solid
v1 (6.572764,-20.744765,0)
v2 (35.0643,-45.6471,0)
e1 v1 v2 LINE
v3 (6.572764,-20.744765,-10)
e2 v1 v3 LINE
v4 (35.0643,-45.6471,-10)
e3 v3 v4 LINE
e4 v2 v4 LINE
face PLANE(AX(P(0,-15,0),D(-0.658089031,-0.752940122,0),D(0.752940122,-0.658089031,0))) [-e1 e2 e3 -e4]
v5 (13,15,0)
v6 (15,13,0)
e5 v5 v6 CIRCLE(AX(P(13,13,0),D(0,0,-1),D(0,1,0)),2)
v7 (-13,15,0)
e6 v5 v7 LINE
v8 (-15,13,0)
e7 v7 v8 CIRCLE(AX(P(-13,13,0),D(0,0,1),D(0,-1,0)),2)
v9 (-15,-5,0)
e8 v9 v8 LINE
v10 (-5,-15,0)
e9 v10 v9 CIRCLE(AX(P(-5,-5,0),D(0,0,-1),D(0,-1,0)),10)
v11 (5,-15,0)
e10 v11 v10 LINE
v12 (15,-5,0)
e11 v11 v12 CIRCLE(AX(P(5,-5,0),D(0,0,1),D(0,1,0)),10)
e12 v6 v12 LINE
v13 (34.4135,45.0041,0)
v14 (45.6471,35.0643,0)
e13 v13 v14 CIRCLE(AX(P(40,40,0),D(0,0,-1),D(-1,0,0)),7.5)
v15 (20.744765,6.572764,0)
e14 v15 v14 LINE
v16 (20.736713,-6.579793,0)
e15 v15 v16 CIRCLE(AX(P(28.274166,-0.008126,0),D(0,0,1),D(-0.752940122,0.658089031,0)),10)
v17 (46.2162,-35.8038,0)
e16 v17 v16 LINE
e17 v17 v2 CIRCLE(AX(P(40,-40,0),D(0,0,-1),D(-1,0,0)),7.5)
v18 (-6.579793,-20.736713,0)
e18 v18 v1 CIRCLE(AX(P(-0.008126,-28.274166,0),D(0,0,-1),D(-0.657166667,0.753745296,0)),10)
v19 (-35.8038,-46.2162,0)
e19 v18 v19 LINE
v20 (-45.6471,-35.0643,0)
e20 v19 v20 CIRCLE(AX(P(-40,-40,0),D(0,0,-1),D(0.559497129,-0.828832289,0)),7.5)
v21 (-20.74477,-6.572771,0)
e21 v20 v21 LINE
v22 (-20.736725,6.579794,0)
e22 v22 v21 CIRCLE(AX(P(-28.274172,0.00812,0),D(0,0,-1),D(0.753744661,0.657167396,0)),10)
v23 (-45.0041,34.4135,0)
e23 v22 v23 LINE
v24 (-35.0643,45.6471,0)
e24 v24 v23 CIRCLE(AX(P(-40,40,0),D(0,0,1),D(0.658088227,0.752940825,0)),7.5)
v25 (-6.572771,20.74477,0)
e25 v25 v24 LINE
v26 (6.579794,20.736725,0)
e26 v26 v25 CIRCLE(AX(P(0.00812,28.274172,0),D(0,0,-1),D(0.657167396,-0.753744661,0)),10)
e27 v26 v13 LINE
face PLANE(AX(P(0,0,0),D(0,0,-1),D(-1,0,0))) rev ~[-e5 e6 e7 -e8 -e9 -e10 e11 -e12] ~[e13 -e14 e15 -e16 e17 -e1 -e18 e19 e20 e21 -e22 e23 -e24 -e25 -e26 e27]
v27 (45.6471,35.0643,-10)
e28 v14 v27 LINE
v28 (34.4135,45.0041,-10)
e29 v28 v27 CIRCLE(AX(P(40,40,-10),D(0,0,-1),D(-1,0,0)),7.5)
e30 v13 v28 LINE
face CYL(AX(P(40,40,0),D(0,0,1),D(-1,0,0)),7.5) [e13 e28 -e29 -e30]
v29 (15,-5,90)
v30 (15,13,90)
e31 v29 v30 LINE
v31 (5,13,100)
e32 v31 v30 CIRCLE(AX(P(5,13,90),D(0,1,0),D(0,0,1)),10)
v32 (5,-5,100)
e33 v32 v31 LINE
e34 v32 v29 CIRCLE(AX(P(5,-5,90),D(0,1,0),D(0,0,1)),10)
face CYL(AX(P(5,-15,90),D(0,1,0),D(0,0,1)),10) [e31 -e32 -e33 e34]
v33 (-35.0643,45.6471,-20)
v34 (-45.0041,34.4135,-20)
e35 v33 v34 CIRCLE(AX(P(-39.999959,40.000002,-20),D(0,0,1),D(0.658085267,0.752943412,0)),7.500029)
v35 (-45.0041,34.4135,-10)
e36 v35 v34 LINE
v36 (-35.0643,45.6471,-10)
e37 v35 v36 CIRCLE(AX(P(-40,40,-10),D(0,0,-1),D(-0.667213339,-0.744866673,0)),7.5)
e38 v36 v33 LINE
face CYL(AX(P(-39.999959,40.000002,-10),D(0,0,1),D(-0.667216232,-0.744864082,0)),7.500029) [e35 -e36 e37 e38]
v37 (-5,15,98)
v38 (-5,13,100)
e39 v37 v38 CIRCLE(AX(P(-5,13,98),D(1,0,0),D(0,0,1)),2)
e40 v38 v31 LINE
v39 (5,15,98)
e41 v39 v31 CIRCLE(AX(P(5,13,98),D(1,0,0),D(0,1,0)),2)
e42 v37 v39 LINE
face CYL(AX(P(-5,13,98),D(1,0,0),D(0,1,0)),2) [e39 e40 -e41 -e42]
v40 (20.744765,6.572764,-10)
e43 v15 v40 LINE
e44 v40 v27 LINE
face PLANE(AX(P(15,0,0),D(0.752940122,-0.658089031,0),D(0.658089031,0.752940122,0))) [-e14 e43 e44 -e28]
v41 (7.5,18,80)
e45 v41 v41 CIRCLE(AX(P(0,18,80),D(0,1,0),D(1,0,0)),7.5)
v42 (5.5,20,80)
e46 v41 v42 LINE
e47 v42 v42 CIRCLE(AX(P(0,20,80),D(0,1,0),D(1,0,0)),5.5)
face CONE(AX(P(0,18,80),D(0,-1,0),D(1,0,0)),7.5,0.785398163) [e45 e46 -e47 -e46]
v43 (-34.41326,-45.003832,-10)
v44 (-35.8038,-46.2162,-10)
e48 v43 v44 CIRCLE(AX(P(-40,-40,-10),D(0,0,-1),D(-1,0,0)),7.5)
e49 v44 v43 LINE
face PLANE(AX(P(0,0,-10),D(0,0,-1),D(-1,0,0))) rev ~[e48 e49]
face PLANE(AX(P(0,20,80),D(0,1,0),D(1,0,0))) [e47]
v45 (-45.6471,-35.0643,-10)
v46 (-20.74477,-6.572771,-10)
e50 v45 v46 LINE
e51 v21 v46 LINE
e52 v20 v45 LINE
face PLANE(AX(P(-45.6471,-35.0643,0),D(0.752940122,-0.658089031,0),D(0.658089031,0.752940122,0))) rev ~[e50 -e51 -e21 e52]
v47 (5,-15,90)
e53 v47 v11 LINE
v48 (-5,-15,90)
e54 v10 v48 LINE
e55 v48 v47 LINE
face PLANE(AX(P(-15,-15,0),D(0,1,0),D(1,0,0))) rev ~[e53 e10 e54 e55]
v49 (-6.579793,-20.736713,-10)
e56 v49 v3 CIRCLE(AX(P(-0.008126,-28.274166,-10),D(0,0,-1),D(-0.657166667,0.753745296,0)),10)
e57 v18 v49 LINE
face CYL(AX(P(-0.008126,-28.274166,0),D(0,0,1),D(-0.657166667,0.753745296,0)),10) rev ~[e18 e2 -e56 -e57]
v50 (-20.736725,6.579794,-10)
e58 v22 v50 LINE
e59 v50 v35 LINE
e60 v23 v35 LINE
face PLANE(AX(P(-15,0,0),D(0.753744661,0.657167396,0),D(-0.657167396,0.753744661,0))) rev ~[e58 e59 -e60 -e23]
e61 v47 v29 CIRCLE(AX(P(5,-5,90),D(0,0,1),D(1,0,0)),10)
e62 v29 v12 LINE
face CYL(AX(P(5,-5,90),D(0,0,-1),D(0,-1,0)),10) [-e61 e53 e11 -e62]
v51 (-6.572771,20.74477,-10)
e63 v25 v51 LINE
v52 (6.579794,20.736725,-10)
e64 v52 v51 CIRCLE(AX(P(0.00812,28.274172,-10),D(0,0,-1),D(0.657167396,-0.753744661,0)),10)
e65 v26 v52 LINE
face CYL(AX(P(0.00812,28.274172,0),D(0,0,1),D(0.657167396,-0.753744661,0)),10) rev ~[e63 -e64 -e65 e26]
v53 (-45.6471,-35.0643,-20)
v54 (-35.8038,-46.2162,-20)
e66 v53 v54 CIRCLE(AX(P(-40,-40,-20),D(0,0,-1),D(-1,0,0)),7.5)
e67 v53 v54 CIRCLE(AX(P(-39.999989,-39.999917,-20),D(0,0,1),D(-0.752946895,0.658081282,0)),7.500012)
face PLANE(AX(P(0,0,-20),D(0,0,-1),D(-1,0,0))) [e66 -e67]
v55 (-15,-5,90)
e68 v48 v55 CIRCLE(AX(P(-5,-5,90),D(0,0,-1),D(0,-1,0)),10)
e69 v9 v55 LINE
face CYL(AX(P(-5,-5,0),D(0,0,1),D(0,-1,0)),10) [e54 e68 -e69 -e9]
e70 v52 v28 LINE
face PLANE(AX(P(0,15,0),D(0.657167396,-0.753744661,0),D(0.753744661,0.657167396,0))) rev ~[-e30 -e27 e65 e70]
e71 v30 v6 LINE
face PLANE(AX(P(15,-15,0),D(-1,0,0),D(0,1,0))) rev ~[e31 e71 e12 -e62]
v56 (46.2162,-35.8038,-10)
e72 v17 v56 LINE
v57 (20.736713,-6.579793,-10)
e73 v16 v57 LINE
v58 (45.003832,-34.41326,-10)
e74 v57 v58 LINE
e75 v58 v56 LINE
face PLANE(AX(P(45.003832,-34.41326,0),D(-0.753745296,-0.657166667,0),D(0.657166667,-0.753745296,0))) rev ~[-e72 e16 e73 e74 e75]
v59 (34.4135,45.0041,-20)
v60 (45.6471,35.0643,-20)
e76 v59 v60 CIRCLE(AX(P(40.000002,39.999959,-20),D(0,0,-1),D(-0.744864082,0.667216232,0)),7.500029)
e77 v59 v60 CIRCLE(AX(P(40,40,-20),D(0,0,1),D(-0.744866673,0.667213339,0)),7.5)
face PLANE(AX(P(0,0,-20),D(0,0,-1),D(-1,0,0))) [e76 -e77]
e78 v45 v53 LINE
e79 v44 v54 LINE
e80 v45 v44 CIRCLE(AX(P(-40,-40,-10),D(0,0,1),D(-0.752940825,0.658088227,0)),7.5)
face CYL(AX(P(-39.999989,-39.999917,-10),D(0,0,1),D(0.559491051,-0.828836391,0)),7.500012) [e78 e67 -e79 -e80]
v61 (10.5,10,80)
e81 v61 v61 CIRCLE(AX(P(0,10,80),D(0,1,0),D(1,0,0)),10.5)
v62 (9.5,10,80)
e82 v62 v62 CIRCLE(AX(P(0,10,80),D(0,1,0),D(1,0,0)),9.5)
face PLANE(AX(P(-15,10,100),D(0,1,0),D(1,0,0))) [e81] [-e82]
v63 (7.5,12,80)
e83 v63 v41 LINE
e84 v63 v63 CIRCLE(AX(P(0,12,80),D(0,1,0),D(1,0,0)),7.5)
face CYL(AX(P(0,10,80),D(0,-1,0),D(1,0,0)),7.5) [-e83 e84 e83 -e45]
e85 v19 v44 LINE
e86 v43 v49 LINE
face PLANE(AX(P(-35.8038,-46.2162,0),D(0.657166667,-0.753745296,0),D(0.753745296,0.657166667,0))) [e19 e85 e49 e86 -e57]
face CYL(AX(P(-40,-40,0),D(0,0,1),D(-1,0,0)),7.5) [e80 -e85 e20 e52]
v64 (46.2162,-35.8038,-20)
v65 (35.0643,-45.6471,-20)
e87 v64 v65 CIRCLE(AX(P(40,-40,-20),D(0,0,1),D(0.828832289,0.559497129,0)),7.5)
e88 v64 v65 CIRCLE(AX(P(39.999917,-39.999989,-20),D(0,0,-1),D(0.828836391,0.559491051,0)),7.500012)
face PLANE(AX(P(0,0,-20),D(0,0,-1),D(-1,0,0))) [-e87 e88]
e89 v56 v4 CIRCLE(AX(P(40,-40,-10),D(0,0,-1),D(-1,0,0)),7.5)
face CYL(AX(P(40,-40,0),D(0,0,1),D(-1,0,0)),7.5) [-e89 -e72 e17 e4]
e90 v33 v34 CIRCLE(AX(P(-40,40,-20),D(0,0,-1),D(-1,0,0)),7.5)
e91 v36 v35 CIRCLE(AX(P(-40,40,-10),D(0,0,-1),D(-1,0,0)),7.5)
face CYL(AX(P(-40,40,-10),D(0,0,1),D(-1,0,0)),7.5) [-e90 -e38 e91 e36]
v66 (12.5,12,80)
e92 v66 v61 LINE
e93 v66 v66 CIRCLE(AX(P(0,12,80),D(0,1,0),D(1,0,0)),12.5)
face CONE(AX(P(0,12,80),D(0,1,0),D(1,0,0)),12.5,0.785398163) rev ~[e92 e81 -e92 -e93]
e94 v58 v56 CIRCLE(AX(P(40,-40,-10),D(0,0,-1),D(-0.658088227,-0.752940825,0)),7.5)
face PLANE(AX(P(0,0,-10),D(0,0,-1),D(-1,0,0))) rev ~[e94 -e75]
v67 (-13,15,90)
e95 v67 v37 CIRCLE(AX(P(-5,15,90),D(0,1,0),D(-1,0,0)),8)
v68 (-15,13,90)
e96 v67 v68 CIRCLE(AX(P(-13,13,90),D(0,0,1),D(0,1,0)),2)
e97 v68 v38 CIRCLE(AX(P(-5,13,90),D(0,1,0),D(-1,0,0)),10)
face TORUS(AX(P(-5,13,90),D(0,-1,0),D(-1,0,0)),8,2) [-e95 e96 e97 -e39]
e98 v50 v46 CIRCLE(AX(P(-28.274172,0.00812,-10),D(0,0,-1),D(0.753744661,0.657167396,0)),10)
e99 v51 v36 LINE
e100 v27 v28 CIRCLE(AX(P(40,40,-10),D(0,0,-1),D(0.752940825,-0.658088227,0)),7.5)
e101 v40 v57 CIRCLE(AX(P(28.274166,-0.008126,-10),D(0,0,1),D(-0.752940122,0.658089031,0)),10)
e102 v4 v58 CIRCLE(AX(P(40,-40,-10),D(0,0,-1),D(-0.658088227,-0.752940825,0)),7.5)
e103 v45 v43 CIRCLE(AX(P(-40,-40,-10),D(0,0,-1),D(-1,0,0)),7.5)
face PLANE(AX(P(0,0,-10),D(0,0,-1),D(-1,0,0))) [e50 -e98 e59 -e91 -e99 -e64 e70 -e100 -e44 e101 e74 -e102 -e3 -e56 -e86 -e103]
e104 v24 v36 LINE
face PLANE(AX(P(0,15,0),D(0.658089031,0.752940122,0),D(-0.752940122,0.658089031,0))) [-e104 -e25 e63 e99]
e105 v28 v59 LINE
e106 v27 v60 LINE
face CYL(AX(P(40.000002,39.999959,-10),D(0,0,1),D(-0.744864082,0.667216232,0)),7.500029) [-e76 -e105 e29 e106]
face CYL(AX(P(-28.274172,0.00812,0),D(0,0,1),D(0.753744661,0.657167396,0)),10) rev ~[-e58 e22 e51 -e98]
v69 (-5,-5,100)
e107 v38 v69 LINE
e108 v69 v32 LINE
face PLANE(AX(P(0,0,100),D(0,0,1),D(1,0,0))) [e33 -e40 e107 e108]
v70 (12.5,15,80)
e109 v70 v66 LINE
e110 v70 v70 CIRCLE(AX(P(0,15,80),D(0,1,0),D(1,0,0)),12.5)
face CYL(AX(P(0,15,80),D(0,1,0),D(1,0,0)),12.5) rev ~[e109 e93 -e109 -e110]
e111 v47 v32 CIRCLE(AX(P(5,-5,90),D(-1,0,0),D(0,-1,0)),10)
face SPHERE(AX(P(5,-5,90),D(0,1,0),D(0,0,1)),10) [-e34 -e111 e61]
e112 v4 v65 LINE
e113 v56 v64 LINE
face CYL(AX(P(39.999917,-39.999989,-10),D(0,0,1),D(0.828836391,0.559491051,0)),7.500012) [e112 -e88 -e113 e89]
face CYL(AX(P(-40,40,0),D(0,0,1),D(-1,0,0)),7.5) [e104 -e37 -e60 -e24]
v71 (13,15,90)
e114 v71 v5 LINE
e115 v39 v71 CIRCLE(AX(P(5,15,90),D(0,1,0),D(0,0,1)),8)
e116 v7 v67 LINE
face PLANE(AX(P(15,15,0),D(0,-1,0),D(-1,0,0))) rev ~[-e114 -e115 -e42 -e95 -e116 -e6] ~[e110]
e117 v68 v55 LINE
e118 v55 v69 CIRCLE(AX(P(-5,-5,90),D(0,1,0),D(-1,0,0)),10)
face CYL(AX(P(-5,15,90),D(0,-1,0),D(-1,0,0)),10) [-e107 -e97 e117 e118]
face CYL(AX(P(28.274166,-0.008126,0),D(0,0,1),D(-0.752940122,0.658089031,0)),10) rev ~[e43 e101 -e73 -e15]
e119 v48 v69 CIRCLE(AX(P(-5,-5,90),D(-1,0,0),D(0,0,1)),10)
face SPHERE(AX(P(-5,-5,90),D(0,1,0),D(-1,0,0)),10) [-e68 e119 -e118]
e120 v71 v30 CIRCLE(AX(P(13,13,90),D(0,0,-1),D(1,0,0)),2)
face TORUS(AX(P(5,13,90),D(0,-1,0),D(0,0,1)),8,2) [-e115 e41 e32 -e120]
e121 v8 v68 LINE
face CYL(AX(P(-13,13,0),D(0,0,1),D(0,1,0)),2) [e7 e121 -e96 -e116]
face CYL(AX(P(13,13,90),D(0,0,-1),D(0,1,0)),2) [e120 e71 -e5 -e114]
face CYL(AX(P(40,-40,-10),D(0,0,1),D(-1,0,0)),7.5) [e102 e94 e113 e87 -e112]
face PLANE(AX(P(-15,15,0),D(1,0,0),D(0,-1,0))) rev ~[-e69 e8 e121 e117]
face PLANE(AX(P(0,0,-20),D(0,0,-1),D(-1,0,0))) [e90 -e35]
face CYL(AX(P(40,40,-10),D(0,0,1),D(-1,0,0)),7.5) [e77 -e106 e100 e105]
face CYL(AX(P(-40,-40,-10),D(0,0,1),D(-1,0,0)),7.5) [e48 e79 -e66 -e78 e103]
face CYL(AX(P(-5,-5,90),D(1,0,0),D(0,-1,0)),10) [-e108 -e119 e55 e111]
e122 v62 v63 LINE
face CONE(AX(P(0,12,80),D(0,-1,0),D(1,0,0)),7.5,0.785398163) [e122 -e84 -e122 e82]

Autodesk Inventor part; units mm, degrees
ref_plane "YZ Plane" through (0, 0, 0) normal (1, 0, 0) x (0, 1, 0)
ref_plane "XZ Plane" through (0, 0, 0) normal (0, 1, 0) x (-1, 0, 0)
ref_plane "XY Plane" through (0, 0, 0) normal (0, 0, 1) x (1, 0, 0)
sketch "Skizze1" plane through (0, 0, 0) normal (0, 0, 1) x (1, 0, 0)
  line L0 (-15, -15) -> (15, -15)
  line L1 (15, -15) -> (15, 15)
  line L2 (15, 15) -> (-15, 15)
  line L3 (-15, 15) -> (-15, -15)
  line L4 (-15, -15) -> (15, 15) construction
  line L5 (15, -15) -> (-15, 15) construction
  point P0 (0, 0)
  dimension "d0" = 30
  dimension "d1" = 30
extrude "Extrusion1" add sketch "Skizze1" along normal blind 100
sketch "Skizze2" plane through (0, 0, 0) normal (0, 0, -1) x (-1, 0, 0)
  circle A0 centre (40, -40) radius 7.5
  circle A1 centre (-40, -40) radius 7.5
  circle A2 centre (-40, 40) radius 7.5
  circle A3 centre (40, 40) radius 7.5
  line L0 (0, -66.5) -> (0, 66.5) projected
  line L1 (66.5, 0) -> (-66.5, 0) projected
  line L2 (45.6471, -35.0643) -> (15, 0)
  line L3 (15, 15) -> (15, -15) projected
  line L4 (35.8038, -46.2162) -> (0, -15)
  line L5 (15, -15) -> (-15, -15) projected
  line L6 (0, -15) -> (-35.0643, -45.6471)
  line L7 (-15, -15) -> (-15, 15) projected
  line L8 (-15, 0) -> (-46.2162, -35.8038)
  line L9 (-15, 15) -> (15, 15) projected
  line L10 (0, 15) -> (-34.4135, 45.0041)
  line L11 (-15, 0) -> (-45.6471, 35.0643)
  line L12 (0, 15) -> (35.0643, 45.6471)
  line L13 (15, 0) -> (45.0041, 34.4135)
  point P0 (0, 0)
  dimension "d4" = 15
  dimension "d5" = 15
  dimension "d6" = 15
  dimension "d7" = 15
  dimension "d8" = 40
  dimension "d9" = 40
extrude "Extrusion2" add sketch "Skizze2" along normal blind 10 contours A0 L4 | A0 L4 L5 L3 L2 | L3 L5 L0 L1 | L1 L0 L9 L3 | L3 L9 L12 A3 L13 | L5 L7 L1 L0 | L6 A1 L8 L7 L5 | L1 L7 L9 L0 | A3 | A1 L8 | L9 L7 L11 A2 L10 | A2 picked at (40.9311, -37.6896) picked at (-39.2767, -42.7034)
sketch "Skizze3" plane through (0, 0, -10) normal (0, 0, -1) x (-1, 0, 0)
  arc A0 (45.0041, 34.4135) -> (35.0643, 45.6471) centre (40, 40) ccw projected
  circle A1 centre (40, 40) radius 7.5
  arc A2 (35.8038, -46.2162) -> (45.6471, -35.0643) centre (40, -40) ccw projected
  circle A3 centre (40, -40) radius 7.5
  arc A4 (-46.2162, -35.8038) -> (-35.0643, -45.6471) centre (-40, -40) ccw projected
  circle A5 centre (-40, -40) radius 7.5
  arc A6 (-34.4135, 45.0041) -> (-45.6471, 35.0643) centre (-40, 40) ccw projected
  circle A7 centre (-40, 40) radius 7.5
  point P0 (0, 0)
  point P1 (-45.6471, 35.0643)
  point P2 (-34.4135, 45.0041)
  point P3 (45.6471, -35.0643)
  point P4 (-35.0643, -45.6471)
  point P5 (-46.2162, -35.8038)
  point P6 (35.0643, 45.6471)
extrude "Extrusion3" add sketch "Skizze3" along normal blind 10
sketch "Skizze4" plane through (-15, 15, 100) normal (0, 1, 0) x (1, 0, 0)
  circle A0 centre (15, 20) radius 12.5
  line L0 (30, 0) -> (0, 0) projected
  point P0 (15, 100)
  dimension "d14" = 25
  dimension "d15" = 20
extrude "Extrusion4" cut sketch "Skizze4" against normal blind 5
sketch "Skizze5" plane through (0, 10, 80) normal (0, 1, 0) x (1, 0, 0)
  circle A0 centre (0, 0) radius 7.5
  point P0 (0, 80)
  dimension "d18" = 15
extrude "Extrusion5" add sketch "Skizze5" along normal blind 10
fillet "Rundung1" radius 10 2 edges at (15, 0, 100) (-15, 0, 100)
fillet "Rundung2" radius 10 5 edges at (12.0711, -15, 97.0711) (0, -15, 100) (-12.0711, -15, 97.0711) (-15, -15, 45) (15, -15, 45)
chamfer "Fase3" distance 2 angle 45 3 edges at (-7.5, 20, 80) (-7.5, 10, 80) (-12.5, 10, 80)
fillet "Rundung3" radius 2 5 edges at (12.0711, 15, 97.0711) (0, 15, 100) (-12.0711, 15, 97.0711) (-15, 15, 45) (15, 15, 45)
fillet "Rundung4" radius 10 4 edges at (0, -15, -5) (15, 0, -5) (-15, 0, -5) (0, 15, -5)
equation "\"d5\" = d4"
equation "\"d6\" = d4"
equation "\"d7\" = d4"
equation "\"d9\" = d8"
properties part number "Sensor"
